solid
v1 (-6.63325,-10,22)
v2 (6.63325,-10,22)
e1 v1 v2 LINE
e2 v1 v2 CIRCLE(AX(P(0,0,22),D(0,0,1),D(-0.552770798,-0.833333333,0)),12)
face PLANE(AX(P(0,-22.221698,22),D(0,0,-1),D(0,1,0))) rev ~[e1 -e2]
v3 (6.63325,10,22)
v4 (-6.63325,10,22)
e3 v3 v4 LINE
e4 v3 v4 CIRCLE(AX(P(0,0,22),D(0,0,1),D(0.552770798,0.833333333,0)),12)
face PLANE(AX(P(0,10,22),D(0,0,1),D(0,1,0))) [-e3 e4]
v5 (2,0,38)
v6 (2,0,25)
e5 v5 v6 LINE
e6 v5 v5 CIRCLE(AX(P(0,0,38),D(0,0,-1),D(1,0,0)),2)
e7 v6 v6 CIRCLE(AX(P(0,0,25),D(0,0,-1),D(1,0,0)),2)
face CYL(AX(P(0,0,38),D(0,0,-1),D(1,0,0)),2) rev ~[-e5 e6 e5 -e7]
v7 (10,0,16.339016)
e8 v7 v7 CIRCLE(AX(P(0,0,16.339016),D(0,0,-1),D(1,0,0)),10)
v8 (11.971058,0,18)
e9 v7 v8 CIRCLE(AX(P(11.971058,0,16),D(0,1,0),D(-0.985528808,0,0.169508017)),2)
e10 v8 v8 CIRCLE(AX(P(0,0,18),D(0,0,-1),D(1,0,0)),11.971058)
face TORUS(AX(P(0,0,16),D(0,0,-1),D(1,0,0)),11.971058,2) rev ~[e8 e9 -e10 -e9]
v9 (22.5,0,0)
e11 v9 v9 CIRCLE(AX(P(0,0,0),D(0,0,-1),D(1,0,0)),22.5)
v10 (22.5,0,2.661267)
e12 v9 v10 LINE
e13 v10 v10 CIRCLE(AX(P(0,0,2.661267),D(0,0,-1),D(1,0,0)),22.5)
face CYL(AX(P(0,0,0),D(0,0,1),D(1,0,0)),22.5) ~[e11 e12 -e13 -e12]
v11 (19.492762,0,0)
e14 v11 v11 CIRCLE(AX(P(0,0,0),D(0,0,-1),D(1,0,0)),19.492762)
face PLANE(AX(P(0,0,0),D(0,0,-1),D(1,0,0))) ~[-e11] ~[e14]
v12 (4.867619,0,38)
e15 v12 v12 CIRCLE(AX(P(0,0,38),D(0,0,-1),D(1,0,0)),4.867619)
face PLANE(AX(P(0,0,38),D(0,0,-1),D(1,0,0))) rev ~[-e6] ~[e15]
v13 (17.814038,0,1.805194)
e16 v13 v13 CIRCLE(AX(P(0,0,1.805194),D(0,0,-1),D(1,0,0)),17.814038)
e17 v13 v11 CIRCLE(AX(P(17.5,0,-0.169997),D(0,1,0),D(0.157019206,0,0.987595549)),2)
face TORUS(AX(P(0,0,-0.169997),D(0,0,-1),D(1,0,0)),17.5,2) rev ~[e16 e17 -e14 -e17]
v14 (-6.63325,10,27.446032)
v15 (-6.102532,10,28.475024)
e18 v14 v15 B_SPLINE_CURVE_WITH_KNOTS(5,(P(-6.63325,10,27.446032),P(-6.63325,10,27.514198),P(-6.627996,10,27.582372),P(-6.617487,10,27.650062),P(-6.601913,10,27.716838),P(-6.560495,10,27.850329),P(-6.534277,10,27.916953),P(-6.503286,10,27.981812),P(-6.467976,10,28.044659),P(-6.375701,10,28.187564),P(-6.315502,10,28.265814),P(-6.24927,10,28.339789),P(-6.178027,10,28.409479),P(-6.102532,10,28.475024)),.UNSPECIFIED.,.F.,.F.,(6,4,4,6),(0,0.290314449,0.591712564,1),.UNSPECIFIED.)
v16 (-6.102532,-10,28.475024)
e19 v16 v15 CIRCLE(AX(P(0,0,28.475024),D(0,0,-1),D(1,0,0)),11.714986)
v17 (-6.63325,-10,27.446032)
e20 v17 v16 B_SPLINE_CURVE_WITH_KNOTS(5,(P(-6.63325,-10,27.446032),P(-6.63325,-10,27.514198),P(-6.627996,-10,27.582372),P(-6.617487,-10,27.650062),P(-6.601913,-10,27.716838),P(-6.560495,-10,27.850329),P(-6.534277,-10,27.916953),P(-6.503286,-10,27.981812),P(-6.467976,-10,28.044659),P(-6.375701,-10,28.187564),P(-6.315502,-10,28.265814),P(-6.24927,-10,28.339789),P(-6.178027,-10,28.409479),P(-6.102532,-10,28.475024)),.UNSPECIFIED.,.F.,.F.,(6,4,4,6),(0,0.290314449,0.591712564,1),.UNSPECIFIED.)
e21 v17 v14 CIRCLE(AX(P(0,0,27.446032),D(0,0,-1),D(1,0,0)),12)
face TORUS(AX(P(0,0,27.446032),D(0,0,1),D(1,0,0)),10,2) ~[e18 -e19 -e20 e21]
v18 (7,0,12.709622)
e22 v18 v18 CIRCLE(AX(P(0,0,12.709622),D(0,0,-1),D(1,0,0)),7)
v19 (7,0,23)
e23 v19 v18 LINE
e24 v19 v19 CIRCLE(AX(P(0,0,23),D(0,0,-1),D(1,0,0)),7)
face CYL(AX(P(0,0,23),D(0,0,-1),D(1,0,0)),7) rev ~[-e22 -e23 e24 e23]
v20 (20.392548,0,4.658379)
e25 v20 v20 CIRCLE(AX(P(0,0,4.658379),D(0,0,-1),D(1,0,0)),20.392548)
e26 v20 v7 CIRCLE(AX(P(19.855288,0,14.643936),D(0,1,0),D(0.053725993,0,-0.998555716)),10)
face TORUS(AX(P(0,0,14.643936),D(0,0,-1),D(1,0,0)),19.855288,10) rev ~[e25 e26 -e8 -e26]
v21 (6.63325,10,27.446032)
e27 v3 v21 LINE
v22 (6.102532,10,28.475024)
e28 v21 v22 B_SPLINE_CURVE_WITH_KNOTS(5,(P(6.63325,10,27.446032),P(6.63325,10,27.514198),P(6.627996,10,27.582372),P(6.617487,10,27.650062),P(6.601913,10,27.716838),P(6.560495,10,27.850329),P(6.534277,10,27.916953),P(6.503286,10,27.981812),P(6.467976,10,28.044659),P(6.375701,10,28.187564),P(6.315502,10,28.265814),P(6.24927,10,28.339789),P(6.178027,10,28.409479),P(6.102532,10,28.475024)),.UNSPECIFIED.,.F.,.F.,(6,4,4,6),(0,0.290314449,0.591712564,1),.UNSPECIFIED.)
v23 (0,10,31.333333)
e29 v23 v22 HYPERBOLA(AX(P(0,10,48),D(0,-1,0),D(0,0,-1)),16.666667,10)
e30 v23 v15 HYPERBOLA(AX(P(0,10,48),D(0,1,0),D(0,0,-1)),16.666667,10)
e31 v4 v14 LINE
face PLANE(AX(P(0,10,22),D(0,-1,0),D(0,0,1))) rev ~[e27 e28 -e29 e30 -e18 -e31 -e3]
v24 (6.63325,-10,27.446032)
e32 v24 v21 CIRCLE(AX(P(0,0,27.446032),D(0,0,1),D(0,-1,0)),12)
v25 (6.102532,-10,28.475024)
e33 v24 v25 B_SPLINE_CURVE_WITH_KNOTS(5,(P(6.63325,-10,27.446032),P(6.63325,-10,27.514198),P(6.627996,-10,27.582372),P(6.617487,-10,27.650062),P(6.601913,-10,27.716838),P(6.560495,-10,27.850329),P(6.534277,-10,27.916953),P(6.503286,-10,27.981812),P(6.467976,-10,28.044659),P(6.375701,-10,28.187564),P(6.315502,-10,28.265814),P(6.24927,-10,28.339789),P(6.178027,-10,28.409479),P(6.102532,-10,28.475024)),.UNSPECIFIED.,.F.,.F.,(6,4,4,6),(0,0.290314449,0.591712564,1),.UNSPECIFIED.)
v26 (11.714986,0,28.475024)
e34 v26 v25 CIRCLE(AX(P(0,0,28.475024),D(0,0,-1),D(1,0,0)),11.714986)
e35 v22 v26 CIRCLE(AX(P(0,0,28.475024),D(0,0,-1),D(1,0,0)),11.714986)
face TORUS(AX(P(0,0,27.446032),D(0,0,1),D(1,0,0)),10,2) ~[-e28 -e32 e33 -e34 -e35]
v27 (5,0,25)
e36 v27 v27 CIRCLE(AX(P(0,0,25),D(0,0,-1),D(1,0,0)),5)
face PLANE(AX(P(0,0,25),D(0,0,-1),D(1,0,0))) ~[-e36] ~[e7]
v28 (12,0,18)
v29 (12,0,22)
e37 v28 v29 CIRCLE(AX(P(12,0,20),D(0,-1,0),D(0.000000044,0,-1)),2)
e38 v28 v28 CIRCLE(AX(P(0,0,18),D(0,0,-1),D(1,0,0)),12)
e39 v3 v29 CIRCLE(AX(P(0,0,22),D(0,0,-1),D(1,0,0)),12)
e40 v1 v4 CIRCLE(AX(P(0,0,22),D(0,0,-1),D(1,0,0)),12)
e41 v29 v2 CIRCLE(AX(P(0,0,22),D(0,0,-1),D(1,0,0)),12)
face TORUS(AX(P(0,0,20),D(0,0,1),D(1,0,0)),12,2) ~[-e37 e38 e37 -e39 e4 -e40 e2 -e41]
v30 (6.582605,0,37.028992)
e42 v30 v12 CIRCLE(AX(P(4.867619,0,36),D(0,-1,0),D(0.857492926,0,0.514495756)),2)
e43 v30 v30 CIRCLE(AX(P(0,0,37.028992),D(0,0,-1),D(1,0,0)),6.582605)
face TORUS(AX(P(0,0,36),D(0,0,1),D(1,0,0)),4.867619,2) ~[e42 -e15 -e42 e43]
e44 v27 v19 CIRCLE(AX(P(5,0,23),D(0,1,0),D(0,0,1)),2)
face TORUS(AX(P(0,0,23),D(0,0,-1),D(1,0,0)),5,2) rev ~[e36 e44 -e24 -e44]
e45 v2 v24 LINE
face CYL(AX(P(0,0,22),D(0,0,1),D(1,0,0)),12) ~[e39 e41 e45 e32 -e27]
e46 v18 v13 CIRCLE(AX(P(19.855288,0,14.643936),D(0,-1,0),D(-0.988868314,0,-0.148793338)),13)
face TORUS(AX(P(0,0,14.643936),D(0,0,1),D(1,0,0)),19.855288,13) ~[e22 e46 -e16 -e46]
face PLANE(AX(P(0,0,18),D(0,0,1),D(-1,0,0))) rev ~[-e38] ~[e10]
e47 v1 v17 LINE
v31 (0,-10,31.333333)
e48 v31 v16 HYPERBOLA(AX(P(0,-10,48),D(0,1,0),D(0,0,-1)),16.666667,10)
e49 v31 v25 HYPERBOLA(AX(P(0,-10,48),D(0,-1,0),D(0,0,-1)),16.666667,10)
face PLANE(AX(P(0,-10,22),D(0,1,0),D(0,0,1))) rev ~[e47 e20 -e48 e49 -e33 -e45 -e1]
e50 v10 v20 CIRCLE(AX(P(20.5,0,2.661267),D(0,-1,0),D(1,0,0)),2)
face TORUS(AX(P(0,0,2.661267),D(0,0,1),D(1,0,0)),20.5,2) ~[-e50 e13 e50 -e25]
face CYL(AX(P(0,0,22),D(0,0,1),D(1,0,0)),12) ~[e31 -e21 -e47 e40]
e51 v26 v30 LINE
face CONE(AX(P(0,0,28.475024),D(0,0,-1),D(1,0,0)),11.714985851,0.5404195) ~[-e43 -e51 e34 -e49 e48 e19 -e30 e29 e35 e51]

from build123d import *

# Parameters (mm, degrees)
F2_W          = 9.1512240469
F2_H          = 19.1432087421
F2_W_2        = 12.2216980672
F2_H_2        = 16.8554036617
F3_DEPTH      = 25
F3_DEPTH_BACK = 25


# Not quite as in the source:
# - a feature names something its author has since deleted; it is built from what else it names


with BuildPart() as f1:
    # F0 (on Front) → F1 (revolve)
    with BuildSketch(Plane.XZ):
        with BuildLine():
            Line((4.8676192421, 38), (2, 38))
            Line((2, 38), (2, 25))
            Line((2, 25), (5, 25))
            ThreePointArc((5, 25), (6.4142135624, 24.4142135624), (7, 23))
            Line((7, 23), (7, 12.7096224699))
            ThreePointArc((7, 12.7096224699), (10.6247219646, 5.4898848922), (17.8140384111, 1.8051937189))
            ThreePointArc((17.8140384111, 1.8051937189), (18.9645863819, 1.1919815957), (19.492762126, 0))
            Line((19.492762126, 0), (19.5, 0))
            Line((19.5, 0), (22.5, 0))
            Line((22.5, 0), (22.5, 2.6612672701))
            ThreePointArc((22.5, 2.6612672701), (21.8756991001, 4.1129738472), (20.3925480139, 4.6583787018))
            ThreePointArc((20.3925480139, 4.6583787018), (12.3842952255, 7.9968112401), (10, 16.3390160333))
            ThreePointArc((10, 16.3390160333), (10.6822659141, 17.5293841713), (11.9710575281, 17.9999999987))
            Line((11.9710575281, 17.9999999987), (12, 18))
            ThreePointArc((12, 18), (13.9999999114, 20), (12, 22))
            Line((12, 22), (12, 27.4460320701))
            ThreePointArc((12, 27.4460320701), (11.9274298564, 27.9798992339), (11.7149858514, 28.475023581))
            Line((11.7149858514, 28.475023581), (6.5826050935, 37.0289915109))
            ThreePointArc((6.5826050935, 37.0289915109), (5.853016872, 37.7403998135), (4.8676192421, 38))
        make_face()
    revolve(axis=Axis((0, 0, 19), (0, 0, -1)))

    # F2 (on Right) → F3 (cut, two sides)
    with BuildSketch(Plane.YZ) as f3_sk:
        with Locations((14.5756120235, 31.5716043711)):
            Rectangle(F2_W, F2_H)
        with Locations((-16.1108490336, 30.4277018309)):
            Rectangle(F2_W_2, F2_H_2)
    extrude(amount=-F3_DEPTH, mode=Mode.SUBTRACT)
    extrude(f3_sk.sketch, amount=F3_DEPTH_BACK, mode=Mode.SUBTRACT)


solid = f1.part
